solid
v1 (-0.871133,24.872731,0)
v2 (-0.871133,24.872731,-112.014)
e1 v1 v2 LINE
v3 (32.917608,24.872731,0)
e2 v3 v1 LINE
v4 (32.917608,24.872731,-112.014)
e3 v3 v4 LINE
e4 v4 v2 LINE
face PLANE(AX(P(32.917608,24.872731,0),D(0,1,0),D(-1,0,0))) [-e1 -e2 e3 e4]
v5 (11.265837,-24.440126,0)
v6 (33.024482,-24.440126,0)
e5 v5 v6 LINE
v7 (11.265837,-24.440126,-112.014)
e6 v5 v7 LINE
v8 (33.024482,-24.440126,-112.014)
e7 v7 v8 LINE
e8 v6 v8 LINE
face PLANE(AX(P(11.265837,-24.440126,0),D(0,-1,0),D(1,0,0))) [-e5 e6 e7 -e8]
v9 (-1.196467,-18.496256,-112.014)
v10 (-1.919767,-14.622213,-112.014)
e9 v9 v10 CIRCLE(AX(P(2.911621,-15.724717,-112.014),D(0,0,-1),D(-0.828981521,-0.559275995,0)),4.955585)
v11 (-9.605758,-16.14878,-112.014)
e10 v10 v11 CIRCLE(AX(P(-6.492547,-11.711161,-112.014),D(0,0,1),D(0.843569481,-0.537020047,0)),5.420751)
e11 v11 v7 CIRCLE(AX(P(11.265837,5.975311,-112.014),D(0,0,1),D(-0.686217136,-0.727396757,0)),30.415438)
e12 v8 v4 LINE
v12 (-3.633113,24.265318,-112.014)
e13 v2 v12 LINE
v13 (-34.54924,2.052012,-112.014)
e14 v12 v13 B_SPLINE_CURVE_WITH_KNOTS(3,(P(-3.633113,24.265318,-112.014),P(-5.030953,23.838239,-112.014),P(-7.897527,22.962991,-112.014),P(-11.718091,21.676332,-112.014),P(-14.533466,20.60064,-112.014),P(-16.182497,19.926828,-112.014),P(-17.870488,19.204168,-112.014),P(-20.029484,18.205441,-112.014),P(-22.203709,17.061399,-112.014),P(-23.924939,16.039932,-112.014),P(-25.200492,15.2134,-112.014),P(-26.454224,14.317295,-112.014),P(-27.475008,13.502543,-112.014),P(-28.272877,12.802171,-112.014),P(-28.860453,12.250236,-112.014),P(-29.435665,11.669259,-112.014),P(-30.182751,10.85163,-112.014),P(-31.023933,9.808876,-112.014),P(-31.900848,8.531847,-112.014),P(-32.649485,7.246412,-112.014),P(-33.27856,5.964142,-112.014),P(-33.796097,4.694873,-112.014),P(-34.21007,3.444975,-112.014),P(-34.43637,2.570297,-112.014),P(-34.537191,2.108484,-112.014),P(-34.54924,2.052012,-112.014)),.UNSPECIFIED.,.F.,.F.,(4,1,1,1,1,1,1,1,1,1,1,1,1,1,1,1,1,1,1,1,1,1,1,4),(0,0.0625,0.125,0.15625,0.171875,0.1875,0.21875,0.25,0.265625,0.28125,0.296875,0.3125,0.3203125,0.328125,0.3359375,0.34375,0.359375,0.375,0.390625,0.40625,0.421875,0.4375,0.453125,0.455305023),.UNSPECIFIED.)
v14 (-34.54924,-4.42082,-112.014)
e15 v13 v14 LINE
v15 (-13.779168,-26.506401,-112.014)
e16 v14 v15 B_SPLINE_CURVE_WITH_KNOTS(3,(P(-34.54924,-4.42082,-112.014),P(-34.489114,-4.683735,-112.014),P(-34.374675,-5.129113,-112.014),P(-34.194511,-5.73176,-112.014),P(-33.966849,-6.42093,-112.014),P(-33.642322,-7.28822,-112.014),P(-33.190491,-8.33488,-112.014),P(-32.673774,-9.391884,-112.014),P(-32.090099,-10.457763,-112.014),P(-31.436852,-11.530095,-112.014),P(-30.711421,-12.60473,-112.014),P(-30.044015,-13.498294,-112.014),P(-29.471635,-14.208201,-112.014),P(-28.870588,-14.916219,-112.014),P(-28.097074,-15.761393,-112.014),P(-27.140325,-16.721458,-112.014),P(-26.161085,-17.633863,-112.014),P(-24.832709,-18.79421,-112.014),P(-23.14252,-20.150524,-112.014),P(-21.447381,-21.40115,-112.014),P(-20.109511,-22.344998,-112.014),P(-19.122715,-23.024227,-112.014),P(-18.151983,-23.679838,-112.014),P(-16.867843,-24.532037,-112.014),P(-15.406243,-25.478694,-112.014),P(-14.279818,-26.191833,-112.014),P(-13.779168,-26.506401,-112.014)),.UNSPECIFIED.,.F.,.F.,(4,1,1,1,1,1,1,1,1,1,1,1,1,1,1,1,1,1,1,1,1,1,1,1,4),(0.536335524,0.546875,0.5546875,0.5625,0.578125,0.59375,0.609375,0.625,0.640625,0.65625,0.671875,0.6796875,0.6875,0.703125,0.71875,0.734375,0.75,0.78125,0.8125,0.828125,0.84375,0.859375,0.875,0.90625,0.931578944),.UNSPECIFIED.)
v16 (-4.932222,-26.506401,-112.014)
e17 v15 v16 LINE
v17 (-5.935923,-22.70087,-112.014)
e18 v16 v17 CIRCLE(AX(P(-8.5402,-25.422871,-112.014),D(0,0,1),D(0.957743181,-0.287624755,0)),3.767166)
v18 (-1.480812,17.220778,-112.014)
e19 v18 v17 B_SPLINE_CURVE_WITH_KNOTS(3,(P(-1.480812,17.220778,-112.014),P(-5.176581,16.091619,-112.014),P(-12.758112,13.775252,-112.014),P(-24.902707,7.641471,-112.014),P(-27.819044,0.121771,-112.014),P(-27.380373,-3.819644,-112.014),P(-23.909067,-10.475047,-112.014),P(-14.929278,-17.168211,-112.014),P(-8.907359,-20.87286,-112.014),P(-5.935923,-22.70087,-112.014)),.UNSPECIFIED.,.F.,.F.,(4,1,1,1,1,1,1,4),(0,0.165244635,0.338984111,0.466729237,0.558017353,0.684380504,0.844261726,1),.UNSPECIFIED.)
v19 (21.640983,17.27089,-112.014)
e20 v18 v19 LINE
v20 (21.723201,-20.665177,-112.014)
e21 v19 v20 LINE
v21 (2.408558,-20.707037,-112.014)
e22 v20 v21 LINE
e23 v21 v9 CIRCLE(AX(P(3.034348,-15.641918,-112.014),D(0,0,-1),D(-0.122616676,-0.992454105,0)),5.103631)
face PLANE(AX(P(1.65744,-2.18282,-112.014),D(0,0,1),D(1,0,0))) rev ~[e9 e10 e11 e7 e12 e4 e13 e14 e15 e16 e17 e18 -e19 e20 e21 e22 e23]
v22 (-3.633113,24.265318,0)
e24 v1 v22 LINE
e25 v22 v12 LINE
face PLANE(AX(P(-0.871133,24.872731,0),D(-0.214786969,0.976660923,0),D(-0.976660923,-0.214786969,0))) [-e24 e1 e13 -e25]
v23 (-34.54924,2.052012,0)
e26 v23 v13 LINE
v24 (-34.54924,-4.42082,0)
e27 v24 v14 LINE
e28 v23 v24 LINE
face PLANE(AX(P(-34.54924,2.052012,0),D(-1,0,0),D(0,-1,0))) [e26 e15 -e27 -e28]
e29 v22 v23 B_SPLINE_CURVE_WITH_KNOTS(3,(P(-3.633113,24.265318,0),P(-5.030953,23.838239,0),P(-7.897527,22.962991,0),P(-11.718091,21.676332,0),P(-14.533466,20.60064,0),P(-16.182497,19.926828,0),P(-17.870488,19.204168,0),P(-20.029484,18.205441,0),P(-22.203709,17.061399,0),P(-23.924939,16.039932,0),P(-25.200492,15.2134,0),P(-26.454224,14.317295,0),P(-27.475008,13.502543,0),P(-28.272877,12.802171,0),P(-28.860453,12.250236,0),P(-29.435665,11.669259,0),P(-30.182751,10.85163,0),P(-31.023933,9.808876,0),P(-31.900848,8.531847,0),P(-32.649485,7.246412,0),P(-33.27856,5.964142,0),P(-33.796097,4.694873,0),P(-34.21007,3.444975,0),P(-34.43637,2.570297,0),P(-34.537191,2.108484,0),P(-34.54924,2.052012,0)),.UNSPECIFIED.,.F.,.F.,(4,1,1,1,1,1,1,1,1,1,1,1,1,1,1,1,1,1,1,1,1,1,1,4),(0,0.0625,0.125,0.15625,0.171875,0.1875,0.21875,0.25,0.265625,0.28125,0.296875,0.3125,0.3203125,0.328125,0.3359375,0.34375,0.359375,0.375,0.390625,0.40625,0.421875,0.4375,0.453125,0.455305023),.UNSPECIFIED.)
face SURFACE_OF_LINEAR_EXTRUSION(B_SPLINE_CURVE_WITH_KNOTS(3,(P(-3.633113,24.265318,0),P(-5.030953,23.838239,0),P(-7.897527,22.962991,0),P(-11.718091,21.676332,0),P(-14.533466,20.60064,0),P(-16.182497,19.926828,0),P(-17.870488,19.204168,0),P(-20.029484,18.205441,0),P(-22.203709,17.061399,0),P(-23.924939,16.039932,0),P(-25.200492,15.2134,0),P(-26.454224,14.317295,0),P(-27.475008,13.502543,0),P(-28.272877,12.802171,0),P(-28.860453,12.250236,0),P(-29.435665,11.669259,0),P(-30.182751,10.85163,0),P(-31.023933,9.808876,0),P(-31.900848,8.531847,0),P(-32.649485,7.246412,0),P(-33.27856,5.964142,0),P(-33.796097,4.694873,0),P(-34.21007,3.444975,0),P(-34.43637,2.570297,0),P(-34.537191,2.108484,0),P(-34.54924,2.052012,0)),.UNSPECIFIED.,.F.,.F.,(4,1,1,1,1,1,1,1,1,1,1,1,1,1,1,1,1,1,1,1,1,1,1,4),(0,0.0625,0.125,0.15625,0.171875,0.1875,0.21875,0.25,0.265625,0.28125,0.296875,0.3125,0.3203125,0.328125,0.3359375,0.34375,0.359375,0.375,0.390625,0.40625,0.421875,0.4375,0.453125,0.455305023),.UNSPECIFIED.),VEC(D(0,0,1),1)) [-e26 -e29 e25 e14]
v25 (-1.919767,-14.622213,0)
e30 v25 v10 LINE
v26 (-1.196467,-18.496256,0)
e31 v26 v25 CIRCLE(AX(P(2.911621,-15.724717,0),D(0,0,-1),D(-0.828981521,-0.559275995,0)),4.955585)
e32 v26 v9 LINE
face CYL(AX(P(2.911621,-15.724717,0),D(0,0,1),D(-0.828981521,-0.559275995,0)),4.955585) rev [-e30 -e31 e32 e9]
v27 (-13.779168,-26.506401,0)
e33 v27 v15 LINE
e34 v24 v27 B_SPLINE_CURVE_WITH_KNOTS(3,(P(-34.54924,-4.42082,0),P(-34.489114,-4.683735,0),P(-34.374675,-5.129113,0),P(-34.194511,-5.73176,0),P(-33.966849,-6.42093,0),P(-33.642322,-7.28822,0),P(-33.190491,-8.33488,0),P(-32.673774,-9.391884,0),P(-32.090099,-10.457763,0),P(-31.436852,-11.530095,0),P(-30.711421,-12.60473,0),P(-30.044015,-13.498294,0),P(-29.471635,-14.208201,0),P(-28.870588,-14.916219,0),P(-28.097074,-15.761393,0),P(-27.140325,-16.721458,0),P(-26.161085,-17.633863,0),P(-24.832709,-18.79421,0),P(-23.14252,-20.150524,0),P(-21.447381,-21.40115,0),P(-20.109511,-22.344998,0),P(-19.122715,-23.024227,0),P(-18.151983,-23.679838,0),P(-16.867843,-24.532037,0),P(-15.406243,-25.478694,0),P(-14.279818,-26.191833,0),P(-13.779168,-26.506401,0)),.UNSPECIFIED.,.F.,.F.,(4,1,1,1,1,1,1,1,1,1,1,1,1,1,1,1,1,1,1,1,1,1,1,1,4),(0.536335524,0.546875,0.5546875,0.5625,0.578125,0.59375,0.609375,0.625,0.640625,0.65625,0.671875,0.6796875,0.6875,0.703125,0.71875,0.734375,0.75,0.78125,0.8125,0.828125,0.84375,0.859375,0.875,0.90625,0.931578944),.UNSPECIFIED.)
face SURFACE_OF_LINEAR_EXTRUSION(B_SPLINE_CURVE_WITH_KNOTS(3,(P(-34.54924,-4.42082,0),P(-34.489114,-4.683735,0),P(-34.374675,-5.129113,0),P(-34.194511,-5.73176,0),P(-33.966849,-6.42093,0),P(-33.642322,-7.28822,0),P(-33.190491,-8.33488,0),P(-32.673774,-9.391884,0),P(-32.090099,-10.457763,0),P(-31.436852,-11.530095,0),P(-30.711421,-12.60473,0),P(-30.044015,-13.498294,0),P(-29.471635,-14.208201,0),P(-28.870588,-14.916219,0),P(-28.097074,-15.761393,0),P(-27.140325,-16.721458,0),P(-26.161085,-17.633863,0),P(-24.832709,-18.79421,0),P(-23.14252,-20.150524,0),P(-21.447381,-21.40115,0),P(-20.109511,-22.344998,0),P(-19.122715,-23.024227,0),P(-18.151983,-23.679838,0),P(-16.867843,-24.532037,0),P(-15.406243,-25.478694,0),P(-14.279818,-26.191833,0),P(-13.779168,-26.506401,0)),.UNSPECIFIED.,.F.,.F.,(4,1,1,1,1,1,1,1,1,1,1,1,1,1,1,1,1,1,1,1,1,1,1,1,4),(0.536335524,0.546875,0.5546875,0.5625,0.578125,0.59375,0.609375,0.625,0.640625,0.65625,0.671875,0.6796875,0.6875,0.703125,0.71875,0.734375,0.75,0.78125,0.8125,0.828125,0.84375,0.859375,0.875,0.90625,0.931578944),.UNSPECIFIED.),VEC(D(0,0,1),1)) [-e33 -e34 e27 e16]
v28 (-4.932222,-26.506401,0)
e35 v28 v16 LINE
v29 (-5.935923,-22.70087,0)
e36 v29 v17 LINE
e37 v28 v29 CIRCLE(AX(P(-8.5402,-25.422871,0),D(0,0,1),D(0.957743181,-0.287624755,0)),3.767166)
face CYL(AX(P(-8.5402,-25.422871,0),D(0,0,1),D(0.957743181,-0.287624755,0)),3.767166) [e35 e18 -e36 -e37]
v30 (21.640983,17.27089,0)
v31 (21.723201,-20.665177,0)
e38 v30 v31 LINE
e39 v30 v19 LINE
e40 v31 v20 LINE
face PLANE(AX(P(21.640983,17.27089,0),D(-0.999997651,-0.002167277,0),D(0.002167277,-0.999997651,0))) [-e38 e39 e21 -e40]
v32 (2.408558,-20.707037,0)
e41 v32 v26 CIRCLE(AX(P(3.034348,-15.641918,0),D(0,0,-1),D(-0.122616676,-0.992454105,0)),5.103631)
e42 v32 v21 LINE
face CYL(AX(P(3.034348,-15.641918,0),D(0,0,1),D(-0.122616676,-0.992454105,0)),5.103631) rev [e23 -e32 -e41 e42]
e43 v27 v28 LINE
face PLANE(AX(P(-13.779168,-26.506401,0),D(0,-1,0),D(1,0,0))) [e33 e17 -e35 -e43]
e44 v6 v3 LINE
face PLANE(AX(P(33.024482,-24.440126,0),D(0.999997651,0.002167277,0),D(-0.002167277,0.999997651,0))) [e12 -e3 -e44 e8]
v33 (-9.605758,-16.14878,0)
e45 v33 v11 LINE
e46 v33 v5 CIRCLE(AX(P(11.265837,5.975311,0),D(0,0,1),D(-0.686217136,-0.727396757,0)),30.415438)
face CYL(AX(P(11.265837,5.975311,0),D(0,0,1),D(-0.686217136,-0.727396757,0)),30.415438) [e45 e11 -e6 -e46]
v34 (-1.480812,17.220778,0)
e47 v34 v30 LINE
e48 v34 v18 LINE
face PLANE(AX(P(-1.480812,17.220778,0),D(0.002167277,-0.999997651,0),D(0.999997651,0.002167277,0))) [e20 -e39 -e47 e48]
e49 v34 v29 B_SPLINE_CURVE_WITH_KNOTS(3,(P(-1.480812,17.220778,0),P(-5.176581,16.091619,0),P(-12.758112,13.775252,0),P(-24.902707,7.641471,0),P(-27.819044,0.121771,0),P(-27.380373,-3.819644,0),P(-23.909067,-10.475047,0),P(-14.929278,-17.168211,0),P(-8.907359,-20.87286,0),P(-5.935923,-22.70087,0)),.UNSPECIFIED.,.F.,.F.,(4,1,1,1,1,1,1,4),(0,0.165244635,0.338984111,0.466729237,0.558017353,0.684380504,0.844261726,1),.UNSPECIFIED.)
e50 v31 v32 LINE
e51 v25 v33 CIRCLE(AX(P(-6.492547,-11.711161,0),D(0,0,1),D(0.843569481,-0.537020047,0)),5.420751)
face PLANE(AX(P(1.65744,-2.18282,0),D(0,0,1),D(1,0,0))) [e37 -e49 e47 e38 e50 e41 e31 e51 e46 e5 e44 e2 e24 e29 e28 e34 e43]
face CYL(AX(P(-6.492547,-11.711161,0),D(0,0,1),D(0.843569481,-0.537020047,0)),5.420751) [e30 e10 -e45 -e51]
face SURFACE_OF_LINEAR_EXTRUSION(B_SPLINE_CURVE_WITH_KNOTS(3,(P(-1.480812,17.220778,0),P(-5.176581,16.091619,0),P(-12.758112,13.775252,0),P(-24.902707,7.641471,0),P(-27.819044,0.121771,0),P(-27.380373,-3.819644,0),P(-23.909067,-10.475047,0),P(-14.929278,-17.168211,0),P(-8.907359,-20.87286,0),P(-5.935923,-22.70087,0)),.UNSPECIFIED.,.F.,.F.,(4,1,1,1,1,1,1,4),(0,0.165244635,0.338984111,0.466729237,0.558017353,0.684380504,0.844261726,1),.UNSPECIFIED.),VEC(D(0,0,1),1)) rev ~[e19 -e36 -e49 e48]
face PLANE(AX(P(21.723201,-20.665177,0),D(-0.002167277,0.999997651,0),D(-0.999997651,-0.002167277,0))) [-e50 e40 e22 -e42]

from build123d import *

# Parameters (mm, degrees)
F1_DEPTH = 112.014


# Not quite as in the source:
# - the dataset's text gives a spline's control points without its knots; the knots are read off the source's solid


with BuildPart() as f1:
    # F0 (on Top) → F1 (new body)
    with BuildSketch(Plane.XY):
        with BuildLine():
            add(Edge.make_bspline(
                [(-3.6331126697, 24.2653177011), (-5.0309529603, 23.8382389404), (-7.8975267056, 22.9629912291), (-11.718090926, 21.6763315248), (-14.5334664534, 20.6006395255), (-16.182496931, 19.9268284227), (-17.8704875446, 19.2041676976), (-20.0294844318, 18.2054412077), (-22.2037087742, 17.0613993179), (-23.9249386903, 16.039932435), (-25.2004920279, 15.2133999646), (-26.4542240511, 14.3172946942), (-27.4750075017, 13.5025428385), (-28.2728766175, 12.8021712395), (-28.8604532589, 12.2502355378), (-29.4356650634, 11.6692589018), (-30.1827509214, 10.8516299584), (-31.0239328159, 9.8088760785), (-31.9008477948, 8.5318465415), (-32.6494845802, 7.2464120404), (-33.2785601353, 5.9641415612), (-33.7960973203, 4.6948725196), (-34.2100695572, 3.4449745693), (-34.4363698162, 2.5702966484), (-34.5371913675, 2.1084842073), (-34.5492400229, 2.0520120912)],
                knots=[0, 0, 0, 0, 0.0625, 0.125, 0.15625, 0.171875, 0.1875, 0.21875, 0.25, 0.265625, 0.28125, 0.296875, 0.3125, 0.3203125, 0.328125, 0.3359375, 0.34375, 0.359375, 0.375, 0.390625, 0.40625, 0.421875, 0.4375, 0.453125, 0.4553050227, 0.4553050227, 0.4553050227, 0.4553050227], degree=3))
            Line((-34.5492400229, 2.0520120912), (-34.5492400229, -4.4208203143))
            add(Edge.make_bspline(
                [(-34.5492400229, -4.4208203143), (-34.489113708, -4.6837345013), (-34.3746747946, -5.1291131913), (-34.1945112231, -5.731759966), (-33.9668488949, -6.420929735), (-33.642322086, -7.288220263), (-33.1904909143, -8.3348803349), (-32.6737742662, -9.3918843822), (-32.0900994525, -10.4577631597), (-31.43685187, -11.53009527), (-30.7114207375, -12.60472958), (-30.0440150101, -13.4982936399), (-29.4716351251, -14.2082014467), (-28.8705883228, -14.9162187281), (-28.0970743584, -15.7613933068), (-27.1403248028, -16.7214580423), (-26.1610852679, -17.6338632647), (-24.8327091865, -18.7942102065), (-23.1425198927, -20.1505242113), (-21.4473806936, -21.4011499112), (-20.1095106505, -22.3449978474), (-19.1227149693, -23.0242265175), (-18.1519831057, -23.6798380791), (-16.8678427909, -24.5320372769), (-15.4062427324, -25.4786943537), (-14.2798180934, -26.1918329815), (-13.7791677315, -26.5064007463)],
                knots=[0.5363355239, 0.5363355239, 0.5363355239, 0.5363355239, 0.546875, 0.5546875, 0.5625, 0.578125, 0.59375, 0.609375, 0.625, 0.640625, 0.65625, 0.671875, 0.6796875, 0.6875, 0.703125, 0.71875, 0.734375, 0.75, 0.78125, 0.8125, 0.828125, 0.84375, 0.859375, 0.875, 0.90625, 0.931578944, 0.931578944, 0.931578944, 0.931578944], degree=3))
            Line((-13.7791677315, -26.5064007463), (-4.9322219839, -26.5064007463))
            ThreePointArc((-4.9322219839, -26.5064007463), (-4.8975988419, -24.462141672), (-5.9359231964, -22.7008704096))
            add(Edge.make_bspline(
                [(-1.4808116248, 17.2207783908), (-5.1765813608, 16.0916188086), (-12.758111735, 13.7752521836), (-24.9027070765, 7.6414710987), (-27.8190436978, 0.1217712147), (-27.3803734584, -3.8196436866), (-23.9090668472, -10.4750472767), (-14.9292775561, -17.1682110986), (-8.9073592794, -20.8728602085), (-5.9359231964, -22.7008704096)],
                knots=[0, 0, 0, 0, 0.1652446349, 0.3389841111, 0.4667292372, 0.558017353, 0.684380504, 0.844261726, 1, 1, 1, 1], degree=3))
            Line((-1.4808116248, 17.2207783908), (21.6409831651, 17.2708898329))
            Line((21.6409831651, 17.2708898329), (21.723201308, -20.6651771691))
            Line((21.723201308, -20.6651771691), (2.4085581355, -20.7070374413))
            ThreePointArc((2.4085581355, -20.7070374413), (0.366288536, -19.9926081592), (-1.1964672012, -18.4962563217))
            ThreePointArc((-1.1964672012, -18.4962563217), (-1.9597863377, -16.6342281191), (-1.9197666552, -14.6222133189))
            ThreePointArc((-1.9197666552, -14.6222133189), (-7.5485703286, -6.3942683653), (-9.6057578921, -16.1487795413))
            ThreePointArc((-9.6057578921, -16.1487795413), (0.0367461623, -22.2913896471), (11.2658366561, -24.4401264936))
            Line((11.2658366561, -24.4401264936), (33.024482429, -24.4401264936))
            Line((33.024482429, -24.4401264936), (32.9176075757, 24.8727314174))
            Line((32.9176075757, 24.8727314174), (-0.8711330011, 24.8727314174))
            Line((-0.8711330011, 24.8727314174), (-3.6331126697, 24.2653177011))
        make_face()
    extrude(amount=-F1_DEPTH)


solid = f1.part
